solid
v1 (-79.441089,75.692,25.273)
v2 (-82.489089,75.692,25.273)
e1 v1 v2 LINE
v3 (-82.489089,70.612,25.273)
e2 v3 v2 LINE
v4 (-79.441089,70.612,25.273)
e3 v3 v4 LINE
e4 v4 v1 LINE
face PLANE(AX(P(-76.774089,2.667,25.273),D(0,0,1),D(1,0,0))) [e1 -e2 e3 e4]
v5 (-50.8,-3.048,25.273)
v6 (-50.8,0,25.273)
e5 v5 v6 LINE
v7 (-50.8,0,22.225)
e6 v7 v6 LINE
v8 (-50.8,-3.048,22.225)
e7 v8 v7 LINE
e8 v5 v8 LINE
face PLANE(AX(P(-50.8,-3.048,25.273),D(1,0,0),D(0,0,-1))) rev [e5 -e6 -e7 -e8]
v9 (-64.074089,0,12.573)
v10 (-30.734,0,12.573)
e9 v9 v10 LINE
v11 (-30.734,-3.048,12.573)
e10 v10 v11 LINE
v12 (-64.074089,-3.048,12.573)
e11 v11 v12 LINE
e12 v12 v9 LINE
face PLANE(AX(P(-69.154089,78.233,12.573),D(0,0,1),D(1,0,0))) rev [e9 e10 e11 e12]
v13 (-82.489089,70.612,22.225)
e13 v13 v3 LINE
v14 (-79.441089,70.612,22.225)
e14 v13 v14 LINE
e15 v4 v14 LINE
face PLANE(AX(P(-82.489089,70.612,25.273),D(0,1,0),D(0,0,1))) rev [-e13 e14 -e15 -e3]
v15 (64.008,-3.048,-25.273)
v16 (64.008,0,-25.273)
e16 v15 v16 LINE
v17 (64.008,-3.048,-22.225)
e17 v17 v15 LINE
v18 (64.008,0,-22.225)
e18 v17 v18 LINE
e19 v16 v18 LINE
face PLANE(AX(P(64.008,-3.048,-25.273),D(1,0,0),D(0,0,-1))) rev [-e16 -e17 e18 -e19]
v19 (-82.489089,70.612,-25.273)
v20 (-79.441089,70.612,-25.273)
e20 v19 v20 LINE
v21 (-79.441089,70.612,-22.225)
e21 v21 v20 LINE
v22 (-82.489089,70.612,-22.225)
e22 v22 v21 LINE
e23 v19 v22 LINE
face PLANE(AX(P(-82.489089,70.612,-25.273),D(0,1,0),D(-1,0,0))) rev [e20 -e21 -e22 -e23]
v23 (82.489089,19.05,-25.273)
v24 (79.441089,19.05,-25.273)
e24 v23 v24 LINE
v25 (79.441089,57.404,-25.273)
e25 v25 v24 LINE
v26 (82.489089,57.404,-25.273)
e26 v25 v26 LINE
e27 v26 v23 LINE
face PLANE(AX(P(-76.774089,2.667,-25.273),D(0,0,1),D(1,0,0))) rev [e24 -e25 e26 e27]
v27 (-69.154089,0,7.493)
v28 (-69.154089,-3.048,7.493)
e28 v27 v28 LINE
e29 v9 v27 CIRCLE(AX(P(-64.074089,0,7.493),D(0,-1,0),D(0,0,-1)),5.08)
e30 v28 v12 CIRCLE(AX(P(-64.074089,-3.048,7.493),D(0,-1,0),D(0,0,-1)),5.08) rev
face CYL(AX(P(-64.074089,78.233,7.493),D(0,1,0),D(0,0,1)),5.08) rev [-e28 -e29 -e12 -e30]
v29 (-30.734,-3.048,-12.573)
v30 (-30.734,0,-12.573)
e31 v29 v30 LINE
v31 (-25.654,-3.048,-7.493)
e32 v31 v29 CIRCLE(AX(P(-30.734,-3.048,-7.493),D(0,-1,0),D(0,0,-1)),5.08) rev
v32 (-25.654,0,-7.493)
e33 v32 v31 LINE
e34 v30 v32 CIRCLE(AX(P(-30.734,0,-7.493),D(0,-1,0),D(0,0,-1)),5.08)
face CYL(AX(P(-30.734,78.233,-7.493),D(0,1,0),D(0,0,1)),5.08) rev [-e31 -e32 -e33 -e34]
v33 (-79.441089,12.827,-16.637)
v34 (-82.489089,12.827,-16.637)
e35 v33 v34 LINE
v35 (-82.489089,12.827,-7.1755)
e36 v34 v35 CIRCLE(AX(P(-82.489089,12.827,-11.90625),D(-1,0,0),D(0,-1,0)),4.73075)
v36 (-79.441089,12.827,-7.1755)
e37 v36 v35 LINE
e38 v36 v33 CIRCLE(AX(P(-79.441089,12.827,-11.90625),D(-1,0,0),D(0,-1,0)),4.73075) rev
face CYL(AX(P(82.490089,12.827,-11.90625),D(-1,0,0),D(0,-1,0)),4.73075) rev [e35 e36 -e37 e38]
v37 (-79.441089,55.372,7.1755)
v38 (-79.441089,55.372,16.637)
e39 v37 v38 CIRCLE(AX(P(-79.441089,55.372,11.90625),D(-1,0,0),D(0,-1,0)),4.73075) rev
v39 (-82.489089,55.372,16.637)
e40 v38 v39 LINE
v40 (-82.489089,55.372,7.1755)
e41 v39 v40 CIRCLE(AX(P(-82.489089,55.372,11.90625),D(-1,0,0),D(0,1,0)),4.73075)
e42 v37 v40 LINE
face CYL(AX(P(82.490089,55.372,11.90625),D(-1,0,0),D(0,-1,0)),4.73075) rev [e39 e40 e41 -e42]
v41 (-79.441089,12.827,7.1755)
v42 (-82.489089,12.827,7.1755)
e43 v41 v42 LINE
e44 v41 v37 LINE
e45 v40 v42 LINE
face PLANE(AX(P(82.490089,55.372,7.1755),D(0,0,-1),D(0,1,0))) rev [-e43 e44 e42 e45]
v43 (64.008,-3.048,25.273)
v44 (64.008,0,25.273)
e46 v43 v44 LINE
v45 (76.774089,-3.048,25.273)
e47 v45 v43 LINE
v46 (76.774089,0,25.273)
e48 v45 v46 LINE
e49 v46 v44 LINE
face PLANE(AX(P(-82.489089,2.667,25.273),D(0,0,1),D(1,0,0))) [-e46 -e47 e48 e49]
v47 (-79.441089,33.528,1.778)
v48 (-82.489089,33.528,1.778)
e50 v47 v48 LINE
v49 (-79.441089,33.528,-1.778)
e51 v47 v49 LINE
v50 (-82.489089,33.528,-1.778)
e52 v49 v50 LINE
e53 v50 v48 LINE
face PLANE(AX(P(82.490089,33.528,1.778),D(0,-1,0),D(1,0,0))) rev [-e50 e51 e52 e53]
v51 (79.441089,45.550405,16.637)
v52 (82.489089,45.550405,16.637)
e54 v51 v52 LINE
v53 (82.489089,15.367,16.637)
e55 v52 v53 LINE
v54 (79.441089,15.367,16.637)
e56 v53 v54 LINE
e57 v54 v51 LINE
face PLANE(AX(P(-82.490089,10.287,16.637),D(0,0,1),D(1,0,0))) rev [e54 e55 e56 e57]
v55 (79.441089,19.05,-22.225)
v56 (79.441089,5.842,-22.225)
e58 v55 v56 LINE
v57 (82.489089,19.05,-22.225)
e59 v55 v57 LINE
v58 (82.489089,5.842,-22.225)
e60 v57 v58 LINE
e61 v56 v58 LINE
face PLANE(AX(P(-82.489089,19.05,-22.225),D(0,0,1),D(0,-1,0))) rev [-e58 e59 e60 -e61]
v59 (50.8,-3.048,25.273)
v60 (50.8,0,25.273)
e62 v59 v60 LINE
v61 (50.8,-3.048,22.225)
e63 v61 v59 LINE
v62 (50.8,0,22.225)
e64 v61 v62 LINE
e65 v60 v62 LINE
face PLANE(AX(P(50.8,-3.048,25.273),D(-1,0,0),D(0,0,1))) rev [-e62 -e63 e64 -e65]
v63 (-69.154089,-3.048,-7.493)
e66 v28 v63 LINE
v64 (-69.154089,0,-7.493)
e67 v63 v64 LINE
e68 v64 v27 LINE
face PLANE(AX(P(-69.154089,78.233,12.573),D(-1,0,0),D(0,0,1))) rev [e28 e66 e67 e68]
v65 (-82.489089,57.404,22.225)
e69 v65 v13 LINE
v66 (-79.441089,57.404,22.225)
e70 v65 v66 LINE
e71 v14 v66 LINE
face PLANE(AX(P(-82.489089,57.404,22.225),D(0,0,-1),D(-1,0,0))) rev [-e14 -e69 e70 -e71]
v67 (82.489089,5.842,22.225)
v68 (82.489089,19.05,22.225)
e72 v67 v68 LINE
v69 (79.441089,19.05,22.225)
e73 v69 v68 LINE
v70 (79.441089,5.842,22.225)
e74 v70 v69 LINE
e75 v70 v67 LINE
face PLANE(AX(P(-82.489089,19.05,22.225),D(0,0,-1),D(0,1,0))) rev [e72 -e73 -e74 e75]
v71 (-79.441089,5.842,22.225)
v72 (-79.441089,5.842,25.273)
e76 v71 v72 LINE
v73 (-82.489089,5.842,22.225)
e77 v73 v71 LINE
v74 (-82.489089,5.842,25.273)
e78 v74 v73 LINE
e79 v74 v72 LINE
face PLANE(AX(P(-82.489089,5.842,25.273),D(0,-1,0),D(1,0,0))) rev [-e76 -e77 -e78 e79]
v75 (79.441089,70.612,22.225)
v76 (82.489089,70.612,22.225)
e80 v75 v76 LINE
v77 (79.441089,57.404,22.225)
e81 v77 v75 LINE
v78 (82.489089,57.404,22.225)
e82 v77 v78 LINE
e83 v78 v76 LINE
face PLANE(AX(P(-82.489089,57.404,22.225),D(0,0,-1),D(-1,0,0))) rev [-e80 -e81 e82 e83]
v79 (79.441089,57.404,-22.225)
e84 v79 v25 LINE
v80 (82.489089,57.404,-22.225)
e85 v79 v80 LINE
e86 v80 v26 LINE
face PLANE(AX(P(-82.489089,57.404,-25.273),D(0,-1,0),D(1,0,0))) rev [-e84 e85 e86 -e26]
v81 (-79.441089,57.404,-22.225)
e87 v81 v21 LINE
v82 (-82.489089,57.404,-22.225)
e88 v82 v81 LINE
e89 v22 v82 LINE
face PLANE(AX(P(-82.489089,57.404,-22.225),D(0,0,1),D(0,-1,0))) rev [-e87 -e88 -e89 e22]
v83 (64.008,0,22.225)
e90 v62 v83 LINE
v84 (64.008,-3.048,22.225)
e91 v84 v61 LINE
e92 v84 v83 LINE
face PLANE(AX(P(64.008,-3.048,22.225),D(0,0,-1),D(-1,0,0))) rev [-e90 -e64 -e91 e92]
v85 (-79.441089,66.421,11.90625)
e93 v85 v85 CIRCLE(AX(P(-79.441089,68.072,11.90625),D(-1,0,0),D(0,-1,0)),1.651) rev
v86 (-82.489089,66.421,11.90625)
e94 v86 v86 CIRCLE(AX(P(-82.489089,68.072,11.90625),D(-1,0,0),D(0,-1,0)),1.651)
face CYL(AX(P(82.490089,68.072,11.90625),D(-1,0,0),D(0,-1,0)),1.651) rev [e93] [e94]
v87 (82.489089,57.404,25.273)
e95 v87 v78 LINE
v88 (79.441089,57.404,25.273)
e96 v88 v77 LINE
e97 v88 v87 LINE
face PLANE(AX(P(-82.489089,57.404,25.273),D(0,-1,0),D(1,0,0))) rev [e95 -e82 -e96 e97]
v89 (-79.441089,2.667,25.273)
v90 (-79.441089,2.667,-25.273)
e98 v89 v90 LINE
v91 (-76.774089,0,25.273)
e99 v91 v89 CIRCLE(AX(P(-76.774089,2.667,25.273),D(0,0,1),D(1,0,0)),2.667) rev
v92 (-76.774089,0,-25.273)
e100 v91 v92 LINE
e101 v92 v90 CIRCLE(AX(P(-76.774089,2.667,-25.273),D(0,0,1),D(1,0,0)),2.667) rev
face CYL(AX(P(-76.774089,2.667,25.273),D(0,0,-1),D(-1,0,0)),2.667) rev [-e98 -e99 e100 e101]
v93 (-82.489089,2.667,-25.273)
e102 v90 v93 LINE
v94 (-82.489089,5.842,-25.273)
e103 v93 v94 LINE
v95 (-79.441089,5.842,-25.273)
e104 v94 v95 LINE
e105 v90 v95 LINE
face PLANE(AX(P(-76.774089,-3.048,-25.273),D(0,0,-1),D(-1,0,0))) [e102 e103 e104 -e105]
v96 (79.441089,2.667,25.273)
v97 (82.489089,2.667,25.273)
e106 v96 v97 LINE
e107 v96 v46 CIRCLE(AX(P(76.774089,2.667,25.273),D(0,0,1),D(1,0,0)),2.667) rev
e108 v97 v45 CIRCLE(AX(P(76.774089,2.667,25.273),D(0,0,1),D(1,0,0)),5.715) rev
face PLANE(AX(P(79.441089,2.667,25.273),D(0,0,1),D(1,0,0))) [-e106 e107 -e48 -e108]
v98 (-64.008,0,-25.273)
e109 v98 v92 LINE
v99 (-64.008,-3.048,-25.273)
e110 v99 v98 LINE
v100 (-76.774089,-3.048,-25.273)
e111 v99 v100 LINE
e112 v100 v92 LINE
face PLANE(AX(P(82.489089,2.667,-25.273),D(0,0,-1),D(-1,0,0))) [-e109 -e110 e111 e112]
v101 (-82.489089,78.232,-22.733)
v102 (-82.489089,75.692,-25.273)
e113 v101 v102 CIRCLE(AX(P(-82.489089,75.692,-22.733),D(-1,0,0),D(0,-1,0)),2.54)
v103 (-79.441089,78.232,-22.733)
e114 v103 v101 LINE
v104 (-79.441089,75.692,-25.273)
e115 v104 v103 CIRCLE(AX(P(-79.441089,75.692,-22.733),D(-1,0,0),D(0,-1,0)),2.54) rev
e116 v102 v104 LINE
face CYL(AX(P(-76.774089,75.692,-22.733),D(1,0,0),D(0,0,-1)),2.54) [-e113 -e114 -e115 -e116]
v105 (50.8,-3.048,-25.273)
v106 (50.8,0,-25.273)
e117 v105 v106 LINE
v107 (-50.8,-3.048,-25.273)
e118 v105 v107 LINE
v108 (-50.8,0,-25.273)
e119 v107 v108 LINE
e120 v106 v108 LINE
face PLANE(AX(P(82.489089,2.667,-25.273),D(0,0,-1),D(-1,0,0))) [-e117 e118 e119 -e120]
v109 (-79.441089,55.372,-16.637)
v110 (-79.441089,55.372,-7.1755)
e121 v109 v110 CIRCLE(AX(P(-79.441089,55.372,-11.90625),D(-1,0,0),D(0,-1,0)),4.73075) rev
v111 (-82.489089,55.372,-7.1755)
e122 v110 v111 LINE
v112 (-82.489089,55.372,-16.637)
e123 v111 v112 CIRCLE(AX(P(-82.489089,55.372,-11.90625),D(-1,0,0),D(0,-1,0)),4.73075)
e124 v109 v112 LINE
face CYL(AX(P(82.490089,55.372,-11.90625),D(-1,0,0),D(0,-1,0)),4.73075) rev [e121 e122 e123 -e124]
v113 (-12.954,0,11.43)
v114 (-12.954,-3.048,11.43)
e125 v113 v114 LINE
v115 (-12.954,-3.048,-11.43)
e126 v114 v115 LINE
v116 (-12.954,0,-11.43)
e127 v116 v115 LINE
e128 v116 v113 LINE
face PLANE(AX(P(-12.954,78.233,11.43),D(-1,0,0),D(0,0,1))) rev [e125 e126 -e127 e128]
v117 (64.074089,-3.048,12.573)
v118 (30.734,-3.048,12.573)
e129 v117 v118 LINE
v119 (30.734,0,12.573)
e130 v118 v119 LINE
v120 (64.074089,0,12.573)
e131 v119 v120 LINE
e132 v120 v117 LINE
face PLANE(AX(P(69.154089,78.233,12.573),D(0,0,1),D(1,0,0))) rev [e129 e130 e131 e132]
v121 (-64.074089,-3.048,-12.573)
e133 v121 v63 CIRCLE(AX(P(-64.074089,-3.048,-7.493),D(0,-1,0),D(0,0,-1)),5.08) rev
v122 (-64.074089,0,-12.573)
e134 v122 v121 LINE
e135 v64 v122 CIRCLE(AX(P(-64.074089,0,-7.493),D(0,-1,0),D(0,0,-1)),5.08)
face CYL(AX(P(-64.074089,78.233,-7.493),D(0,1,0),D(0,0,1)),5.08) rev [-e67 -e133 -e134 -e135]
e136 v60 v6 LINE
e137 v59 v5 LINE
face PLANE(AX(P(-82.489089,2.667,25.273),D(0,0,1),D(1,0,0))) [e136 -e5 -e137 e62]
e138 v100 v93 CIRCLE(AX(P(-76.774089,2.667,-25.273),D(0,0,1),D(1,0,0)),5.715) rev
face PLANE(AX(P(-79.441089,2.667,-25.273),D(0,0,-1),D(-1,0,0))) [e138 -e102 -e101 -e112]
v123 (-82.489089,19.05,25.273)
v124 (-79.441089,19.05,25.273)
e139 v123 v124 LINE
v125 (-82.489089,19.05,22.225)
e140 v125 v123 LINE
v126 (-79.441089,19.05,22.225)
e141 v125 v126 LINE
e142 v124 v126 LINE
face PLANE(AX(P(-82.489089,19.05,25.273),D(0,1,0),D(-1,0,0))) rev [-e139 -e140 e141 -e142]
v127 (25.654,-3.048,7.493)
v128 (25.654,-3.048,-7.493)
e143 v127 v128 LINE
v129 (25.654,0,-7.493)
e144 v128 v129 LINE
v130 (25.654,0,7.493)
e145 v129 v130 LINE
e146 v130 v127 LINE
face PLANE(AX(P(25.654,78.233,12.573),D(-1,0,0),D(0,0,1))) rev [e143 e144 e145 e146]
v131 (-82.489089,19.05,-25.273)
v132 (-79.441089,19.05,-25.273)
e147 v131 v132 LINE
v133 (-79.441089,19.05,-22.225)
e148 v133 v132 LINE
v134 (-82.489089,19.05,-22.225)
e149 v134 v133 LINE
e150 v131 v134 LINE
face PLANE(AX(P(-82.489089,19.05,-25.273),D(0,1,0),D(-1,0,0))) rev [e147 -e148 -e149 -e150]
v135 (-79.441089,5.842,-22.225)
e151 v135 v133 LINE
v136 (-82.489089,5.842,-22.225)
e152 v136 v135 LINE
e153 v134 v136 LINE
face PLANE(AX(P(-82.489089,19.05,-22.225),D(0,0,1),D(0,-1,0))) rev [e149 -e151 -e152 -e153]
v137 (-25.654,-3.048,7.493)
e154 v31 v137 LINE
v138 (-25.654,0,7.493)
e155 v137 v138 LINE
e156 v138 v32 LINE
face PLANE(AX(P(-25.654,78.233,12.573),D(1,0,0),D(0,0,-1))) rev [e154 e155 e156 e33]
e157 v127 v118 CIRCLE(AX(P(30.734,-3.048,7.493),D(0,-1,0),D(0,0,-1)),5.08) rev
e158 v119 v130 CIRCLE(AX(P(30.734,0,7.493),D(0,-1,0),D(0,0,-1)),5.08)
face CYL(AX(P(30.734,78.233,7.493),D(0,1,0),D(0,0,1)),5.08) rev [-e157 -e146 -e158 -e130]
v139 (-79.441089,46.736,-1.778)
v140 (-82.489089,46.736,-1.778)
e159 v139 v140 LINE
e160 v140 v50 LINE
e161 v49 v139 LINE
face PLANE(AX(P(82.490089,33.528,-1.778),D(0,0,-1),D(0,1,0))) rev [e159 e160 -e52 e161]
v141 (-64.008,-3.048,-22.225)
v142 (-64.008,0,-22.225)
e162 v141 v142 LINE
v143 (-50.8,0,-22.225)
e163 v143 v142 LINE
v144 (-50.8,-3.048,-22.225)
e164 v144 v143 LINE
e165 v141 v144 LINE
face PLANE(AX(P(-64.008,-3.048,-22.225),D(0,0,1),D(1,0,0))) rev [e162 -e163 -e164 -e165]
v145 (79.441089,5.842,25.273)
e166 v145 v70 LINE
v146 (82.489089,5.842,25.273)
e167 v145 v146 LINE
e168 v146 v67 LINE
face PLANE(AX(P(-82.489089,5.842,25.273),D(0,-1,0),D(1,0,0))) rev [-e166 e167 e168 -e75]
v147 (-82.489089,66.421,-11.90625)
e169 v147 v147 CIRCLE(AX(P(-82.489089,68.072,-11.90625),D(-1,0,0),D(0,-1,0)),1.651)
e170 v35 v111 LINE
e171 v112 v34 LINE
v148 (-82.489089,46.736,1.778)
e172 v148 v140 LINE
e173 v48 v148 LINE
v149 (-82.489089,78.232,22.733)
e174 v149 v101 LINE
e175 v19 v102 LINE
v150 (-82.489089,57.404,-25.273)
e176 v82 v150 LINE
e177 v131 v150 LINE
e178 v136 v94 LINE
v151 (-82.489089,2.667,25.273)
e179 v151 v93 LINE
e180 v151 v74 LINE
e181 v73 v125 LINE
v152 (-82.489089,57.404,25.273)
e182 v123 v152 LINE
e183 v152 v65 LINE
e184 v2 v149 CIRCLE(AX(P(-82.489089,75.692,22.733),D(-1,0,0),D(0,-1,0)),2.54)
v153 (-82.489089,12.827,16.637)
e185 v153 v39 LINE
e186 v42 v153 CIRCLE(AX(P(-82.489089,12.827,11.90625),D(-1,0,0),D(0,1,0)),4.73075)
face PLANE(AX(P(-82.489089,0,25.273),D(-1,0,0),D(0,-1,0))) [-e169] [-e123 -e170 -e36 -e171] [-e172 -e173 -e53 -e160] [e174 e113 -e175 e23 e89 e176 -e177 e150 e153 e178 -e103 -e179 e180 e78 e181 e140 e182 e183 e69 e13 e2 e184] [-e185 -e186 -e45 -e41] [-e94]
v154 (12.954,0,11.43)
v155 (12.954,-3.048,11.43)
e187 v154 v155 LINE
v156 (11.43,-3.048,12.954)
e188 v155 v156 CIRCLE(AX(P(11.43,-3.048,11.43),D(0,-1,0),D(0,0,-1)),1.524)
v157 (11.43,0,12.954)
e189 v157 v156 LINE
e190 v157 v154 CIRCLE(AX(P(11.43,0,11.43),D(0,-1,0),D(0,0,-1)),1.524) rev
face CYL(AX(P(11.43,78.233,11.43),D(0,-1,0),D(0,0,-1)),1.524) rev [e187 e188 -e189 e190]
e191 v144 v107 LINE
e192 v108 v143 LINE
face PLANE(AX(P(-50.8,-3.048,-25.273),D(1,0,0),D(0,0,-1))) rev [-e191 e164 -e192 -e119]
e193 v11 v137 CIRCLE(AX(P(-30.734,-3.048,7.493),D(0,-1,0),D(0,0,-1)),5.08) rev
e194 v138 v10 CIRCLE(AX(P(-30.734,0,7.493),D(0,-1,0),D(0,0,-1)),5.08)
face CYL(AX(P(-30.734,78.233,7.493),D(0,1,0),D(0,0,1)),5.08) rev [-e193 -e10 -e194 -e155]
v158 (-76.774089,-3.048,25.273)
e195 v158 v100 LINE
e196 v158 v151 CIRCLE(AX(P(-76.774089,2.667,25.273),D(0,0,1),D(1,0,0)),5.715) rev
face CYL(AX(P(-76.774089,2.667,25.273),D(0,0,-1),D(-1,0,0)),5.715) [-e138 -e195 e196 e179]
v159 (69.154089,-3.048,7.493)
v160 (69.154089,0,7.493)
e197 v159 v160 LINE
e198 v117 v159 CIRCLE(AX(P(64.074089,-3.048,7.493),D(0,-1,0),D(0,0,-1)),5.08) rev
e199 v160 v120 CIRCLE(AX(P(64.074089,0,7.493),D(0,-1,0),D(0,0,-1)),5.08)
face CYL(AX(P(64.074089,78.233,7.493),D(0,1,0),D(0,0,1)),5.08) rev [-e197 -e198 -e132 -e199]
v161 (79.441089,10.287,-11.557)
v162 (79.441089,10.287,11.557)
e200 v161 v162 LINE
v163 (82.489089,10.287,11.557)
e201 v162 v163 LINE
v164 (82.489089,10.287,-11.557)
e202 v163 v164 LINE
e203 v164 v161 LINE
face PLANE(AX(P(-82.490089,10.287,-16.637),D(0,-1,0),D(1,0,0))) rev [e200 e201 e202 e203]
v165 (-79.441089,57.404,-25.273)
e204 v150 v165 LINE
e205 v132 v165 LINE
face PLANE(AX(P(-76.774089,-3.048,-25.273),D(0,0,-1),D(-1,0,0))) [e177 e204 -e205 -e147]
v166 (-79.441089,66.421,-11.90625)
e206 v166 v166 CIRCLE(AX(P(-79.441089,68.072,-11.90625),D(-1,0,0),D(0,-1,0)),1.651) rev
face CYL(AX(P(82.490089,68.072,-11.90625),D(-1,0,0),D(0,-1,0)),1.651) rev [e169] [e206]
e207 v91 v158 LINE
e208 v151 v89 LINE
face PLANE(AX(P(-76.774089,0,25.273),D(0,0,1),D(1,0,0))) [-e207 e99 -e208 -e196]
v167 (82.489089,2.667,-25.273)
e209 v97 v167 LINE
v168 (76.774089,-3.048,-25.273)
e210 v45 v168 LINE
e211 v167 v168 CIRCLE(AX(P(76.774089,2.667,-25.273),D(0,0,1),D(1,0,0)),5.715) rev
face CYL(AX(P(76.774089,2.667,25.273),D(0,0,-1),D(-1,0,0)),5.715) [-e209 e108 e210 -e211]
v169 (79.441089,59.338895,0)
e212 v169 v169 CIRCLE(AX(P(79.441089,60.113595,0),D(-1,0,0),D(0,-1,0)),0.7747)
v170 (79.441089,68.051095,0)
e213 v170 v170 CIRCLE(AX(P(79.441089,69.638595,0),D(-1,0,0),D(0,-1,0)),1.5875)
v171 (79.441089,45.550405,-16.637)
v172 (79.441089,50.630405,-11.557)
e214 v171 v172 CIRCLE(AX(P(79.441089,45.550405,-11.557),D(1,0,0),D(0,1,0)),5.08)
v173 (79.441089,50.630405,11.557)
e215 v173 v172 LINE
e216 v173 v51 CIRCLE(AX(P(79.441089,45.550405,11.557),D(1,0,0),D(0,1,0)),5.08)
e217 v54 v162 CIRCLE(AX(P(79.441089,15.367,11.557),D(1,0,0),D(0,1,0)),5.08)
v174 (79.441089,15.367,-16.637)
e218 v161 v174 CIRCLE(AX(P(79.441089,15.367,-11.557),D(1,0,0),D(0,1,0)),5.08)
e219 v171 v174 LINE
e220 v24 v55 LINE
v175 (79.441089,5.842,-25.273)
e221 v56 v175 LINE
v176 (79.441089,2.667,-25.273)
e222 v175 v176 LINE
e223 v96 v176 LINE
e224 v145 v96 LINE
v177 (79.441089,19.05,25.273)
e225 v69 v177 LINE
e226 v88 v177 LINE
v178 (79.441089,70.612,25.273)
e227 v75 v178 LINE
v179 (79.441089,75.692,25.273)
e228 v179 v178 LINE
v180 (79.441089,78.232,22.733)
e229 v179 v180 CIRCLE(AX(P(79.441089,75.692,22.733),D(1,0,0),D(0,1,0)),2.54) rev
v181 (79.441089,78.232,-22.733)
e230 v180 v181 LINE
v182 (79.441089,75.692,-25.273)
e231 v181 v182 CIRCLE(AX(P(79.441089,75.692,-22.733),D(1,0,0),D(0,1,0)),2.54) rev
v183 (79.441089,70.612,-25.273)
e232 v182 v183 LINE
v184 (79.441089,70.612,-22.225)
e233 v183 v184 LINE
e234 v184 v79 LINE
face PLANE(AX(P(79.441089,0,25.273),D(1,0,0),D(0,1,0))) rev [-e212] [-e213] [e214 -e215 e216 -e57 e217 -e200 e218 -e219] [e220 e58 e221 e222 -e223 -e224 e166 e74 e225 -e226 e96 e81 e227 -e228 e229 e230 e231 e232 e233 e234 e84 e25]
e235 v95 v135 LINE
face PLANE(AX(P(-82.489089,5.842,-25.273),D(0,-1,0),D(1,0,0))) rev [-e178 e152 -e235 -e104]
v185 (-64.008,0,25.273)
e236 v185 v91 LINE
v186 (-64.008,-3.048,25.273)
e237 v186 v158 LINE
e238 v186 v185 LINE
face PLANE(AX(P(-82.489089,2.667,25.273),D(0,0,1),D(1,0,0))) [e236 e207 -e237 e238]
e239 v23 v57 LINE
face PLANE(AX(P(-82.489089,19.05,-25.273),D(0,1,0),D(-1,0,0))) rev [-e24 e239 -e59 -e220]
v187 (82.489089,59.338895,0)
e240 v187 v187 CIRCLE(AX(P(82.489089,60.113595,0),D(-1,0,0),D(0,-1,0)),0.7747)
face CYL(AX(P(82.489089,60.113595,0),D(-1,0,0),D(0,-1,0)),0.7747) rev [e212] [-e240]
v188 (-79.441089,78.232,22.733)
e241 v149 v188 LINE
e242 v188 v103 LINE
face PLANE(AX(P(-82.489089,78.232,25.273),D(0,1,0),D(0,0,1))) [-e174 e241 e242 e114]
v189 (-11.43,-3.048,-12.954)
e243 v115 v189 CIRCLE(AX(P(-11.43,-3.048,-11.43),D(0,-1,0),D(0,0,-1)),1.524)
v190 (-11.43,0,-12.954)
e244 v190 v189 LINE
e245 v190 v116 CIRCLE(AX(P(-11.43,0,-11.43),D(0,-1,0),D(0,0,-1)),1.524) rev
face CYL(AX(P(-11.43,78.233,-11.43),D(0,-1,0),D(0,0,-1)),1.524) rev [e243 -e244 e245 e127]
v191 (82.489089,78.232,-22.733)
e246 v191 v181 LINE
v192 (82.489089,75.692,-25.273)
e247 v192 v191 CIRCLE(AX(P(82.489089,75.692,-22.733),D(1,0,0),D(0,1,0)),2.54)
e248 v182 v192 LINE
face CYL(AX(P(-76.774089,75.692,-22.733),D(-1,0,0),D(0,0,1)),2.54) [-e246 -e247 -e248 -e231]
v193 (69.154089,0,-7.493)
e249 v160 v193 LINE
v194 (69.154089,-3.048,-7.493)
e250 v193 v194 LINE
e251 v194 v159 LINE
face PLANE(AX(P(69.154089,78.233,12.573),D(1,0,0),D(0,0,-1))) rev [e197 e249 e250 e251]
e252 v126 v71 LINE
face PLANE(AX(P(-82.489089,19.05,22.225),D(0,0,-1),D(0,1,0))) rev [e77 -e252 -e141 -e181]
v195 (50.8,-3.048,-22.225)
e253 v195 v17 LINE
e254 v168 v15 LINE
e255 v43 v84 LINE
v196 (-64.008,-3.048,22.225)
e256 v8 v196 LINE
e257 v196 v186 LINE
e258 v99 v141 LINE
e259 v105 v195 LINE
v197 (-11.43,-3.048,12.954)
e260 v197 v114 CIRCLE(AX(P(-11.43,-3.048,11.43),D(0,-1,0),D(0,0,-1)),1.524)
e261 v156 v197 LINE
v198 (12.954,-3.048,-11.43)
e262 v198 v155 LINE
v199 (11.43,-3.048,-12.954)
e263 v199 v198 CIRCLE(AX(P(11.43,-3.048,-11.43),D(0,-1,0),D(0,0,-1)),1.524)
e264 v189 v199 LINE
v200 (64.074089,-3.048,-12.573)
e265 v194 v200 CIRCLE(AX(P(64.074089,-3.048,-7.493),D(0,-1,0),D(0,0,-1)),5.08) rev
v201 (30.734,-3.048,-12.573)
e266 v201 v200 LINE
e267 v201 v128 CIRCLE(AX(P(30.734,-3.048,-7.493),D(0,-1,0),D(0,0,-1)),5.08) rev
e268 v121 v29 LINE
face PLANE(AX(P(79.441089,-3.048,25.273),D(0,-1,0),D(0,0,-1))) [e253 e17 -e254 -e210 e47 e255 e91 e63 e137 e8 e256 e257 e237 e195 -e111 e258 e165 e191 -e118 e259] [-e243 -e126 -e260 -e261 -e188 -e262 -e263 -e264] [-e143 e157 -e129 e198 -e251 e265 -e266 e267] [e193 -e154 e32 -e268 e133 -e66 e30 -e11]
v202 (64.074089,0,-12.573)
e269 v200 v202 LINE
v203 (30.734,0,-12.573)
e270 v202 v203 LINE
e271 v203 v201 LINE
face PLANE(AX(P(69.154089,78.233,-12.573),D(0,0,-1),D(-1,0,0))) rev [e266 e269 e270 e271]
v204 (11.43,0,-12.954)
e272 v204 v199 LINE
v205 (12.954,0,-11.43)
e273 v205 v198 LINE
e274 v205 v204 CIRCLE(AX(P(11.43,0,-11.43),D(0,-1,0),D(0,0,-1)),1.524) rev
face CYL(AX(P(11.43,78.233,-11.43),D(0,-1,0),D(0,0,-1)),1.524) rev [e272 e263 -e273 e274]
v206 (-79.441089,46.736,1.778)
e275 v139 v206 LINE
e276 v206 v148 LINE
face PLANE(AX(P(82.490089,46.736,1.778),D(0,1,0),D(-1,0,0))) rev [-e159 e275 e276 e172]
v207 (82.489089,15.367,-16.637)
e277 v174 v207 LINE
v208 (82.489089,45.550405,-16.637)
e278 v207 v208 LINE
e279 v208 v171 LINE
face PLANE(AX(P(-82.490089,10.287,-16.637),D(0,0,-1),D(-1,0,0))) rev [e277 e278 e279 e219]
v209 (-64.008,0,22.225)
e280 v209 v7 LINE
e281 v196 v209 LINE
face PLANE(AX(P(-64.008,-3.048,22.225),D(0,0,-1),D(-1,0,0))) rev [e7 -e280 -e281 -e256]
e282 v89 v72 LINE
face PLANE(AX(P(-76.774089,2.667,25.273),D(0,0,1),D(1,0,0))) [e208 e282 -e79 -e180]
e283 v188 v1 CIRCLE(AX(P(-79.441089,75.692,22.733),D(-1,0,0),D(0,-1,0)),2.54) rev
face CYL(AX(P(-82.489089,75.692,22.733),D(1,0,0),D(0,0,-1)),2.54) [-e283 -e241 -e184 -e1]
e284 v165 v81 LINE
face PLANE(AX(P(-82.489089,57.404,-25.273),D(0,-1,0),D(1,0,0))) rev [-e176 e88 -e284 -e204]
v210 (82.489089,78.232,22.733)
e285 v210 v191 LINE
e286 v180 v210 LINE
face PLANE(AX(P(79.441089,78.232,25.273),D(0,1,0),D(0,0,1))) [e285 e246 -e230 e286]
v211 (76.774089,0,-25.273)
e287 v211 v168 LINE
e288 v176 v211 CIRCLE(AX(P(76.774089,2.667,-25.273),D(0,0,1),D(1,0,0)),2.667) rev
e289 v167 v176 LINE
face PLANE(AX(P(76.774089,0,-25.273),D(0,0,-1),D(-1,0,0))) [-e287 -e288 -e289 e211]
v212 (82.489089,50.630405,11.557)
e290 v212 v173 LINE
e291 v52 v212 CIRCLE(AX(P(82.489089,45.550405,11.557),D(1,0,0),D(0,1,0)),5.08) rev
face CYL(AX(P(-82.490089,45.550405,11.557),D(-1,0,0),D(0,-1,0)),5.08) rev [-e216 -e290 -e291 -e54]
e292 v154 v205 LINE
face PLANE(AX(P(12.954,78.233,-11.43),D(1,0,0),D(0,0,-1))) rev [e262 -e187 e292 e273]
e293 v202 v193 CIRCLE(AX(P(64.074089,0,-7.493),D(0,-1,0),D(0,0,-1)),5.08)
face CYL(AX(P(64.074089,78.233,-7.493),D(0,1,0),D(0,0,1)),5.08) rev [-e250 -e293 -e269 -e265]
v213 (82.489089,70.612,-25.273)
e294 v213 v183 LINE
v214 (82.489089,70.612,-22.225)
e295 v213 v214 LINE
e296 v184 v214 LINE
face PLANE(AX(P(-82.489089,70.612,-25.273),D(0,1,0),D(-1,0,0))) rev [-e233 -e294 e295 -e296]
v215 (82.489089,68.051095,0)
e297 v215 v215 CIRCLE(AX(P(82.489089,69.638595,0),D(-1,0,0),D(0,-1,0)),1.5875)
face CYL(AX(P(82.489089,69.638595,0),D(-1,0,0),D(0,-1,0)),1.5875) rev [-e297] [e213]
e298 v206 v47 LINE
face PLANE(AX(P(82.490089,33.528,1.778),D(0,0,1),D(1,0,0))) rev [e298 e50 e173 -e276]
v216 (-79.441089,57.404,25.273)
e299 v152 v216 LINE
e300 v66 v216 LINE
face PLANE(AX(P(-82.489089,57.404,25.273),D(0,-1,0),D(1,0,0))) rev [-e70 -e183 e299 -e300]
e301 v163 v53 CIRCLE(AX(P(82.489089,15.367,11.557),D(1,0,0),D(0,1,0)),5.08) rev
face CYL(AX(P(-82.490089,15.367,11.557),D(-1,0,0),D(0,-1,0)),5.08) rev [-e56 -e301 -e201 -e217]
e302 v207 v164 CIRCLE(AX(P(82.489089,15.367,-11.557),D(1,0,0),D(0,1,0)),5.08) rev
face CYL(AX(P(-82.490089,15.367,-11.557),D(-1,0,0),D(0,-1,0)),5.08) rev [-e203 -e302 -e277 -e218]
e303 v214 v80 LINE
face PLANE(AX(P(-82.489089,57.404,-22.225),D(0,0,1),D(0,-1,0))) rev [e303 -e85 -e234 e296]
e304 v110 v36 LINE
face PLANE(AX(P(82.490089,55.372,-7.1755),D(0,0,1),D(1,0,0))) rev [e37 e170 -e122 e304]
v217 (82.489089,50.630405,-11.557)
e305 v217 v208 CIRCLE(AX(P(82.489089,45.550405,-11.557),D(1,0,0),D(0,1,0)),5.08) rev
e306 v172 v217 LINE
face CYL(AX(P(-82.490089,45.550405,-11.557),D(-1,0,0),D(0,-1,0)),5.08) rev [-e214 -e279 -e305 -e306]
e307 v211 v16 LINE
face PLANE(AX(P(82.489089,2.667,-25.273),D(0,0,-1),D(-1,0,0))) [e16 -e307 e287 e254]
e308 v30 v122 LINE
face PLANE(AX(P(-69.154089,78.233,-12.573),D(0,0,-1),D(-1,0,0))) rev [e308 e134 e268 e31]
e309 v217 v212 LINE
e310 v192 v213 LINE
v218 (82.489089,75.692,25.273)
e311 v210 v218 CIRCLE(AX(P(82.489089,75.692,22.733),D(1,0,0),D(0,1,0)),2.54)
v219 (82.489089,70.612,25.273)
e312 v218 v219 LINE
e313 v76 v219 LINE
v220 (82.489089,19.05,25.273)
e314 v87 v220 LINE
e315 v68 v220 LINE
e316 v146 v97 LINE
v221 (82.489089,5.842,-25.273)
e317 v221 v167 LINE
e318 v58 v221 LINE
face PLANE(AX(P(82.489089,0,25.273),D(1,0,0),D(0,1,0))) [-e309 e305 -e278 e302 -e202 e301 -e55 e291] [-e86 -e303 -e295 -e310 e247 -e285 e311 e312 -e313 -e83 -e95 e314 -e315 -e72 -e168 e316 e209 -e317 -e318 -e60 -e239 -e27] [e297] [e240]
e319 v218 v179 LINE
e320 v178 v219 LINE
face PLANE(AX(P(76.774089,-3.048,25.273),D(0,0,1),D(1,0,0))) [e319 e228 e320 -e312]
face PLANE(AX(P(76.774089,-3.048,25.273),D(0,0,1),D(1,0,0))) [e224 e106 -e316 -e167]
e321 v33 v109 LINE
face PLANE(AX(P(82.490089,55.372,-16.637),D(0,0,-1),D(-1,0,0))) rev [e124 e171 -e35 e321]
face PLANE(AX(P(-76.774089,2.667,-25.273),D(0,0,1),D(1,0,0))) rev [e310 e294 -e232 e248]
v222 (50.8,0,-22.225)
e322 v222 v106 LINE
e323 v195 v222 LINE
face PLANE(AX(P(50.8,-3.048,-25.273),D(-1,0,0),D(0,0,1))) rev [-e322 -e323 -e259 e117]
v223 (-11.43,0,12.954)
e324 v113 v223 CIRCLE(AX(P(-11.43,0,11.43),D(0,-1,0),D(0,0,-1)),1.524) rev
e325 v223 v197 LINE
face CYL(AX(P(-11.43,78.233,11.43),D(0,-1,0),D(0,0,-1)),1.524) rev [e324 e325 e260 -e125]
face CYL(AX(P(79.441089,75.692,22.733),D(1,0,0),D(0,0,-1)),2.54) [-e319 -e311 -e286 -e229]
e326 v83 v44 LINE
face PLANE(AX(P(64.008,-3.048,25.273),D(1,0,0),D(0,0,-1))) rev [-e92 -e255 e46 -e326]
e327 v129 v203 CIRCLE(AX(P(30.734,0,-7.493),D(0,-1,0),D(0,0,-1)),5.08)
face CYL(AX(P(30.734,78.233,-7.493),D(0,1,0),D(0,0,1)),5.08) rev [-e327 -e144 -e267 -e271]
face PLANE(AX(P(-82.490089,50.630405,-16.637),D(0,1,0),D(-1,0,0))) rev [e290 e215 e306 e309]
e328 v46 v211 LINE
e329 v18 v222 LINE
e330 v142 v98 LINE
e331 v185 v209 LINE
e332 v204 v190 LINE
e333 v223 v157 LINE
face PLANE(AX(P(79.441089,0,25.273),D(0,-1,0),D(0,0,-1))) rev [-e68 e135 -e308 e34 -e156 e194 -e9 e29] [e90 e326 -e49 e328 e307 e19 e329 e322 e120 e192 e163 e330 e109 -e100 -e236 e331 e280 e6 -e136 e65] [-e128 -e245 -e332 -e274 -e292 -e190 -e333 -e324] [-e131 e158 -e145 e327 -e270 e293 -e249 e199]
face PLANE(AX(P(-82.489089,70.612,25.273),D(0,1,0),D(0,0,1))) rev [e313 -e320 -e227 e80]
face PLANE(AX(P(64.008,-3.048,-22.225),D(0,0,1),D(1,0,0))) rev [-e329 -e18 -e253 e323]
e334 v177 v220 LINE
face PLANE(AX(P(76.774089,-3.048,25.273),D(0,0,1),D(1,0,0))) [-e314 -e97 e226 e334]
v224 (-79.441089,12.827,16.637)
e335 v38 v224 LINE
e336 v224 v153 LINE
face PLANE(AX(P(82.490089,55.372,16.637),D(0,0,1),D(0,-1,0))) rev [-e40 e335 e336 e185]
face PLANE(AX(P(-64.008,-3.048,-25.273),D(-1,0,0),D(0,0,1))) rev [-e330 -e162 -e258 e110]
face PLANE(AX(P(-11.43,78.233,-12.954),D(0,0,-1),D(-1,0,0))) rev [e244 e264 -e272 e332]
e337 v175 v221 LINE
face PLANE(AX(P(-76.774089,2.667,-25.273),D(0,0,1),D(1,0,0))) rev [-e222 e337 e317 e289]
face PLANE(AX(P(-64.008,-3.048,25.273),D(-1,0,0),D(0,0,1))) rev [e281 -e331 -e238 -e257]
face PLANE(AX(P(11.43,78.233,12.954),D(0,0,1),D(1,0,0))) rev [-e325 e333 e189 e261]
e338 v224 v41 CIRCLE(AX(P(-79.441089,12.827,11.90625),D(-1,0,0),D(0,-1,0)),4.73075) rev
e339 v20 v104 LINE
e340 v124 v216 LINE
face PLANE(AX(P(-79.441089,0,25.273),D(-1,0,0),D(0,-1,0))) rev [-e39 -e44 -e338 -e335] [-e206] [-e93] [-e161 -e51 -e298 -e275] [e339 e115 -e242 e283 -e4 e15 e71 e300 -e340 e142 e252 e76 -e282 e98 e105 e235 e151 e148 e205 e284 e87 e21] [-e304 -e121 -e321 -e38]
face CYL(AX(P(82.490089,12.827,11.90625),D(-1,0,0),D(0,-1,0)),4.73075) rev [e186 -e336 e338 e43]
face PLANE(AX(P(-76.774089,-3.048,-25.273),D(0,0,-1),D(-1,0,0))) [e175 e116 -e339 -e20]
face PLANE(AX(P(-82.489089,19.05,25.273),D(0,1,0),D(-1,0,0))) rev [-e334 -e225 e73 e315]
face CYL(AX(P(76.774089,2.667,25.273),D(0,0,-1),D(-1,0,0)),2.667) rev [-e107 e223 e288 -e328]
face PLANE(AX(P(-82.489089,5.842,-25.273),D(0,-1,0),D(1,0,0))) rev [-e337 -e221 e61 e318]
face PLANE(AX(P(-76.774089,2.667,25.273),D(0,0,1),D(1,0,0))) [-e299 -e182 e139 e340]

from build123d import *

# Parameters (mm, degrees)
BASE_FLANGE1_DEPTH      = 25.273
CUT_EXTRUDE1_DEPTH      = 117.462097169
CUT_EXTRUDE1_DEPTH_BACK = 117.462097169
SKETCH6_W               = 13.208
SKETCH6_H               = 3.048
CUT_EXTRUDE2_DEPTH      = 182.604935466
CUT_EXTRUDE2_DEPTH_BACK = 182.604935466
SKETCH7_W               = 3.048
SKETCH7_H               = 13.208
FILLET1_R               = 2.54
SKETCH9_R               = 1.5875
SKETCH9_R_2             = 0.7747
CUT_EXTRUDE4_DEPTH      = 182.604935466
CUT_EXTRUDE5_REACH      = 186.328
SKETCH10_R              = 1.651
CUT_EXTRUDE6_REACH      = 186.328
SKETCH11_W              = 3.556
SKETCH11_H              = 13.208
CUT_EXTRUDE8_REACH      = 120.531
SKETCH15_W              = 43.500088515
SKETCH15_H              = 25.146
FILLET2_R               = 5.08
CUT_EXTRUDE9_REACH      = 186.328
CUT_EXTRUDE12_REACH     = 186.328
SKETCH21_W              = 33.274
SKETCH21_H              = 40.343404573
FILLET4_R               = 5.08


# Sheet-metal steps are written as plain solids
with BuildPart() as part:
    # Sketch1 → Base-Flange1 (new, symmetric)
    with BuildSketch(Plane.XY):
        with BuildLine():
            Line((79.441088515, 78.232), (79.441088515, 2.667))
            ThreePointArc((79.441088515, 2.667), (78.6599423, 0.781146215), (76.774088515, 0))
            Line((76.774088515, 0), (-76.774088515, 0))
            ThreePointArc((-76.774088515, 0), (-78.6599423, 0.781146215), (-79.441088515, 2.667))
            Line((-79.441088515, 2.667), (-79.441088515, 78.232))
            Line((-79.441088515, 78.232), (-82.489088515, 78.232))
            Line((-82.489088515, 78.232), (-82.489088515, 2.667))
            ThreePointArc((-82.489088515, 2.667), (-80.815203769, -1.374115254), (-76.774088515, -3.048))
            Line((-76.774088515, -3.048), (76.774088515, -3.048))
            ThreePointArc((76.774088515, -3.048), (80.815203769, -1.374115254), (82.489088515, 2.667))
            Line((82.489088515, 2.667), (82.489088515, 78.232))
            Line((82.489088515, 78.232), (79.441088515, 78.232))
        make_face()
    extrude(amount=BASE_FLANGE1_DEPTH, both=True)

    # Sketch6 → Cut-Extrude1 (cut, two sides: drawn at the far end of the back side and taken through both)
    with BuildSketch(Plane(origin=(0, 0, 0), x_dir=(1, 0, 0), z_dir=(0, 1, 0)).offset(-CUT_EXTRUDE1_DEPTH_BACK)):
        with Locations((-57.404, 23.749)):
            Rectangle(SKETCH6_W, SKETCH6_H)
        with Locations((-57.404, -23.749)):
            Rectangle(SKETCH6_W, SKETCH6_H)
        with Locations((57.404, -23.749)):
            Rectangle(SKETCH6_W, SKETCH6_H)
        with Locations((57.404, 23.749)):
            Rectangle(SKETCH6_W, SKETCH6_H)
    extrude(amount=CUT_EXTRUDE1_DEPTH + CUT_EXTRUDE1_DEPTH_BACK, mode=Mode.SUBTRACT)

    # Sketch7 → Cut-Extrude2 (cut, two sides: drawn at the far end of the back side and taken through both)
    with BuildSketch(Plane(origin=(-79.441088515, 0, 0), x_dir=(0, 0, -1), z_dir=(1, 0, 0)).offset(-CUT_EXTRUDE2_DEPTH_BACK)):
        with Locations((-23.749, 12.446)):
            Rectangle(SKETCH7_W, SKETCH7_H)
        with Locations((23.749, 12.446)):
            Rectangle(SKETCH7_W, SKETCH7_H)
        with Locations((23.749, 64.008)):
            Rectangle(SKETCH7_W, SKETCH7_H)
        with Locations((-23.749, 64.008)):
            Rectangle(SKETCH7_W, SKETCH7_H)
    extrude(amount=CUT_EXTRUDE2_DEPTH + CUT_EXTRUDE2_DEPTH_BACK, mode=Mode.SUBTRACT)

    # Fillet1
    fillet1_edges = [part.edges().sort_by_distance(p)[0] for p in [
        (80.965088515, 78.232, -25.273),
        (-80.965088515, 78.232, -25.273),
        (80.965088515, 78.232, 25.273),
        (-80.965088515, 78.232, 25.273),
    ]]
    fillet(fillet1_edges, radius=FILLET1_R)

    # Sketch9 → Cut-Extrude4 (cut, through all)
    with BuildSketch(Plane.ZY.offset(-79.441088515)):
        with Locations(Location((0, 69.638595427, 0), (0, 0, 270))):
            Circle(SKETCH9_R)
        with Locations(Location((0, 60.113595427, 0), (0, 0, 270))):
            Circle(SKETCH9_R_2)
    extrude(amount=-CUT_EXTRUDE4_DEPTH, mode=Mode.SUBTRACT)

    # Sketch10 → Cut-Extrude5 (cut, up to next)
    with BuildSketch(Plane.ZY.offset(82.489088515), mode=Mode.PRIVATE) as cut_extrude5_sk1:
        with Locations(Location((11.90625, 68.072, 0), (0, 0, 270))):
            Circle(SKETCH10_R)
    cut_extrude5_tool1 = extrude(cut_extrude5_sk1.sketch, amount=-CUT_EXTRUDE5_REACH, mode=Mode.PRIVATE) & part.part
    # Sketch10 → Cut-Extrude5 (cut, up to next)
    with BuildSketch(Plane.ZY.offset(82.489088515), mode=Mode.PRIVATE) as cut_extrude5_sk2:
        with Locations(Location((-11.90625, 68.072, 0), (0, 0, 270))):
            Circle(SKETCH10_R)
    cut_extrude5_tool2 = extrude(cut_extrude5_sk2.sketch, amount=-CUT_EXTRUDE5_REACH, mode=Mode.PRIVATE) & part.part
    add(cut_extrude5_tool1.solids().sort_by_distance((-82.489089, 68.072, 11.90625))[0], mode=Mode.SUBTRACT)
    add(cut_extrude5_tool2.solids().sort_by_distance((-82.489089, 68.072, -11.90625))[0], mode=Mode.SUBTRACT)

    # Sketch11 → Cut-Extrude6 (cut, up to next)
    with BuildSketch(Plane.ZY.offset(82.489088515), mode=Mode.PRIVATE) as cut_extrude6_sk1:
        with Locations((0, 40.132)):
            Rectangle(SKETCH11_W, SKETCH11_H)
    cut_extrude6_tool1 = extrude(cut_extrude6_sk1.sketch, amount=-CUT_EXTRUDE6_REACH, mode=Mode.PRIVATE) & part.part
    add(cut_extrude6_tool1.solids().sort_by_distance((-82.489089, 40.132, 0))[0], mode=Mode.SUBTRACT)

    # Sketch15 → Cut-Extrude8 (cut, up to next)
    with BuildSketch(Plane.XZ.offset(3.048), mode=Mode.PRIVATE) as cut_extrude8_sk1:
        with Locations((-47.404044257, 0)):
            Rectangle(SKETCH15_W, SKETCH15_H)
    cut_extrude8_tool1 = extrude(cut_extrude8_sk1.sketch, amount=-CUT_EXTRUDE8_REACH, mode=Mode.PRIVATE) & part.part
    # Sketch15 → Cut-Extrude8 (cut, up to next)
    with BuildSketch(Plane.XZ.offset(3.048), mode=Mode.PRIVATE) as cut_extrude8_sk2:
        with Locations((47.404044257, 0)):
            Rectangle(SKETCH15_W, SKETCH15_H)
    cut_extrude8_tool2 = extrude(cut_extrude8_sk2.sketch, amount=-CUT_EXTRUDE8_REACH, mode=Mode.PRIVATE) & part.part
    # Sketch15 → Cut-Extrude8 (cut, up to next)
    with BuildSketch(Plane.XZ.offset(3.048), mode=Mode.PRIVATE) as cut_extrude8_sk3:
        with BuildLine():
            Line((12.954, -11.43), (12.954, 11.43))
            ThreePointArc((12.954, 11.43), (12.507630735, 12.507630735), (11.43, 12.954))
            Line((11.43, 12.954), (-11.43, 12.954))
            ThreePointArc((-11.43, 12.954), (-12.507630735, 12.507630735), (-12.954, 11.43))
            Line((-12.954, 11.43), (-12.954, -11.43))
            ThreePointArc((-12.954, -11.43), (-12.507630735, -12.507630735), (-11.43, -12.954))
            Line((-11.43, -12.954), (11.43, -12.954))
            ThreePointArc((11.43, -12.954), (12.507630735, -12.507630735), (12.954, -11.43))
        make_face()
    cut_extrude8_tool3 = extrude(cut_extrude8_sk3.sketch, amount=-CUT_EXTRUDE8_REACH, mode=Mode.PRIVATE) & part.part
    add(cut_extrude8_tool1.solids().sort_by_distance((-47.404044, -3.048, 0))[0], mode=Mode.SUBTRACT)
    add(cut_extrude8_tool2.solids().sort_by_distance((47.404044, -3.048, 0))[0], mode=Mode.SUBTRACT)
    add(cut_extrude8_tool3.solids().sort_by_distance((0, -3.048, 0))[0], mode=Mode.SUBTRACT)

    # Fillet2
    fillet2_edges = [part.edges().sort_by_distance(p)[0] for p in [
        (-69.154088515, -1.524, -12.573),
        (-69.154088515, -1.524, 12.573),
        (-25.654, -1.524, 12.573),
        (-25.654, -1.524, -12.573),
        (25.654, -1.524, 12.573),
        (69.154088515, -1.524, 12.573),
        (69.154088515, -1.524, -12.573),
        (25.654, -1.524, -12.573),
    ]]
    fillet(fillet2_edges, radius=FILLET2_R)

    # Sketch17 → Cut-Extrude9 (cut, up to next)
    with BuildSketch(Plane.ZY.offset(82.489088515), mode=Mode.PRIVATE) as cut_extrude9_sk1:
        with BuildLine():
            Line((-7.1755, 55.372), (-7.1755, 12.827))
            ThreePointArc((-7.1755, 12.827), (-11.90625, 8.09625), (-16.637, 12.827))
            Line((-16.637, 12.827), (-16.637, 55.372))
            ThreePointArc((-16.637, 55.372), (-11.90625, 60.10275), (-7.1755, 55.372))
        make_face()
    cut_extrude9_tool1 = extrude(cut_extrude9_sk1.sketch, amount=-CUT_EXTRUDE9_REACH, mode=Mode.PRIVATE) & part.part
    # Sketch17 → Cut-Extrude9 (cut, up to next)
    with BuildSketch(Plane.ZY.offset(82.489088515), mode=Mode.PRIVATE) as cut_extrude9_sk2:
        with BuildLine():
            Line((7.1755, 55.372), (7.1755, 12.827))
            ThreePointArc((7.1755, 12.827), (11.90625, 8.09625), (16.637, 12.827))
            Line((16.637, 12.827), (16.637, 55.372))
            ThreePointArc((16.637, 55.372), (11.90625, 60.10275), (7.1755, 55.372))
        make_face()
    cut_extrude9_tool2 = extrude(cut_extrude9_sk2.sketch, amount=-CUT_EXTRUDE9_REACH, mode=Mode.PRIVATE) & part.part
    add(cut_extrude9_tool1.solids().sort_by_distance((-82.489089, 34.0995, -11.90625))[0], mode=Mode.SUBTRACT)
    add(cut_extrude9_tool2.solids().sort_by_distance((-82.489089, 34.0995, 11.90625))[0], mode=Mode.SUBTRACT)

    # Sketch21 → Cut-Extrude12 (cut, up to next)
    with BuildSketch(Plane(origin=(82.489088515, 0, 0), x_dir=(0, 0, -1), z_dir=(1, 0, 0)), mode=Mode.PRIVATE) as cut_extrude12_sk1:
        with Locations((0, 30.458702286)):
            Rectangle(SKETCH21_W, SKETCH21_H)
    cut_extrude12_tool1 = extrude(cut_extrude12_sk1.sketch, amount=-CUT_EXTRUDE12_REACH, mode=Mode.PRIVATE) & part.part
    add(cut_extrude12_tool1.solids().sort_by_distance((82.489089, 30.458702, 0))[0], mode=Mode.SUBTRACT)

    # Fillet4
    fillet4_edges = [part.edges().sort_by_distance(p)[0] for p in [
        (80.965088515, 50.630404573, -16.637),
        (80.965088515, 10.287, -16.637),
        (80.965088515, 10.287, 16.637),
        (80.965088515, 50.630404573, 16.637),
    ]]
    fillet(fillet4_edges, radius=FILLET4_R)


solid = part.part
